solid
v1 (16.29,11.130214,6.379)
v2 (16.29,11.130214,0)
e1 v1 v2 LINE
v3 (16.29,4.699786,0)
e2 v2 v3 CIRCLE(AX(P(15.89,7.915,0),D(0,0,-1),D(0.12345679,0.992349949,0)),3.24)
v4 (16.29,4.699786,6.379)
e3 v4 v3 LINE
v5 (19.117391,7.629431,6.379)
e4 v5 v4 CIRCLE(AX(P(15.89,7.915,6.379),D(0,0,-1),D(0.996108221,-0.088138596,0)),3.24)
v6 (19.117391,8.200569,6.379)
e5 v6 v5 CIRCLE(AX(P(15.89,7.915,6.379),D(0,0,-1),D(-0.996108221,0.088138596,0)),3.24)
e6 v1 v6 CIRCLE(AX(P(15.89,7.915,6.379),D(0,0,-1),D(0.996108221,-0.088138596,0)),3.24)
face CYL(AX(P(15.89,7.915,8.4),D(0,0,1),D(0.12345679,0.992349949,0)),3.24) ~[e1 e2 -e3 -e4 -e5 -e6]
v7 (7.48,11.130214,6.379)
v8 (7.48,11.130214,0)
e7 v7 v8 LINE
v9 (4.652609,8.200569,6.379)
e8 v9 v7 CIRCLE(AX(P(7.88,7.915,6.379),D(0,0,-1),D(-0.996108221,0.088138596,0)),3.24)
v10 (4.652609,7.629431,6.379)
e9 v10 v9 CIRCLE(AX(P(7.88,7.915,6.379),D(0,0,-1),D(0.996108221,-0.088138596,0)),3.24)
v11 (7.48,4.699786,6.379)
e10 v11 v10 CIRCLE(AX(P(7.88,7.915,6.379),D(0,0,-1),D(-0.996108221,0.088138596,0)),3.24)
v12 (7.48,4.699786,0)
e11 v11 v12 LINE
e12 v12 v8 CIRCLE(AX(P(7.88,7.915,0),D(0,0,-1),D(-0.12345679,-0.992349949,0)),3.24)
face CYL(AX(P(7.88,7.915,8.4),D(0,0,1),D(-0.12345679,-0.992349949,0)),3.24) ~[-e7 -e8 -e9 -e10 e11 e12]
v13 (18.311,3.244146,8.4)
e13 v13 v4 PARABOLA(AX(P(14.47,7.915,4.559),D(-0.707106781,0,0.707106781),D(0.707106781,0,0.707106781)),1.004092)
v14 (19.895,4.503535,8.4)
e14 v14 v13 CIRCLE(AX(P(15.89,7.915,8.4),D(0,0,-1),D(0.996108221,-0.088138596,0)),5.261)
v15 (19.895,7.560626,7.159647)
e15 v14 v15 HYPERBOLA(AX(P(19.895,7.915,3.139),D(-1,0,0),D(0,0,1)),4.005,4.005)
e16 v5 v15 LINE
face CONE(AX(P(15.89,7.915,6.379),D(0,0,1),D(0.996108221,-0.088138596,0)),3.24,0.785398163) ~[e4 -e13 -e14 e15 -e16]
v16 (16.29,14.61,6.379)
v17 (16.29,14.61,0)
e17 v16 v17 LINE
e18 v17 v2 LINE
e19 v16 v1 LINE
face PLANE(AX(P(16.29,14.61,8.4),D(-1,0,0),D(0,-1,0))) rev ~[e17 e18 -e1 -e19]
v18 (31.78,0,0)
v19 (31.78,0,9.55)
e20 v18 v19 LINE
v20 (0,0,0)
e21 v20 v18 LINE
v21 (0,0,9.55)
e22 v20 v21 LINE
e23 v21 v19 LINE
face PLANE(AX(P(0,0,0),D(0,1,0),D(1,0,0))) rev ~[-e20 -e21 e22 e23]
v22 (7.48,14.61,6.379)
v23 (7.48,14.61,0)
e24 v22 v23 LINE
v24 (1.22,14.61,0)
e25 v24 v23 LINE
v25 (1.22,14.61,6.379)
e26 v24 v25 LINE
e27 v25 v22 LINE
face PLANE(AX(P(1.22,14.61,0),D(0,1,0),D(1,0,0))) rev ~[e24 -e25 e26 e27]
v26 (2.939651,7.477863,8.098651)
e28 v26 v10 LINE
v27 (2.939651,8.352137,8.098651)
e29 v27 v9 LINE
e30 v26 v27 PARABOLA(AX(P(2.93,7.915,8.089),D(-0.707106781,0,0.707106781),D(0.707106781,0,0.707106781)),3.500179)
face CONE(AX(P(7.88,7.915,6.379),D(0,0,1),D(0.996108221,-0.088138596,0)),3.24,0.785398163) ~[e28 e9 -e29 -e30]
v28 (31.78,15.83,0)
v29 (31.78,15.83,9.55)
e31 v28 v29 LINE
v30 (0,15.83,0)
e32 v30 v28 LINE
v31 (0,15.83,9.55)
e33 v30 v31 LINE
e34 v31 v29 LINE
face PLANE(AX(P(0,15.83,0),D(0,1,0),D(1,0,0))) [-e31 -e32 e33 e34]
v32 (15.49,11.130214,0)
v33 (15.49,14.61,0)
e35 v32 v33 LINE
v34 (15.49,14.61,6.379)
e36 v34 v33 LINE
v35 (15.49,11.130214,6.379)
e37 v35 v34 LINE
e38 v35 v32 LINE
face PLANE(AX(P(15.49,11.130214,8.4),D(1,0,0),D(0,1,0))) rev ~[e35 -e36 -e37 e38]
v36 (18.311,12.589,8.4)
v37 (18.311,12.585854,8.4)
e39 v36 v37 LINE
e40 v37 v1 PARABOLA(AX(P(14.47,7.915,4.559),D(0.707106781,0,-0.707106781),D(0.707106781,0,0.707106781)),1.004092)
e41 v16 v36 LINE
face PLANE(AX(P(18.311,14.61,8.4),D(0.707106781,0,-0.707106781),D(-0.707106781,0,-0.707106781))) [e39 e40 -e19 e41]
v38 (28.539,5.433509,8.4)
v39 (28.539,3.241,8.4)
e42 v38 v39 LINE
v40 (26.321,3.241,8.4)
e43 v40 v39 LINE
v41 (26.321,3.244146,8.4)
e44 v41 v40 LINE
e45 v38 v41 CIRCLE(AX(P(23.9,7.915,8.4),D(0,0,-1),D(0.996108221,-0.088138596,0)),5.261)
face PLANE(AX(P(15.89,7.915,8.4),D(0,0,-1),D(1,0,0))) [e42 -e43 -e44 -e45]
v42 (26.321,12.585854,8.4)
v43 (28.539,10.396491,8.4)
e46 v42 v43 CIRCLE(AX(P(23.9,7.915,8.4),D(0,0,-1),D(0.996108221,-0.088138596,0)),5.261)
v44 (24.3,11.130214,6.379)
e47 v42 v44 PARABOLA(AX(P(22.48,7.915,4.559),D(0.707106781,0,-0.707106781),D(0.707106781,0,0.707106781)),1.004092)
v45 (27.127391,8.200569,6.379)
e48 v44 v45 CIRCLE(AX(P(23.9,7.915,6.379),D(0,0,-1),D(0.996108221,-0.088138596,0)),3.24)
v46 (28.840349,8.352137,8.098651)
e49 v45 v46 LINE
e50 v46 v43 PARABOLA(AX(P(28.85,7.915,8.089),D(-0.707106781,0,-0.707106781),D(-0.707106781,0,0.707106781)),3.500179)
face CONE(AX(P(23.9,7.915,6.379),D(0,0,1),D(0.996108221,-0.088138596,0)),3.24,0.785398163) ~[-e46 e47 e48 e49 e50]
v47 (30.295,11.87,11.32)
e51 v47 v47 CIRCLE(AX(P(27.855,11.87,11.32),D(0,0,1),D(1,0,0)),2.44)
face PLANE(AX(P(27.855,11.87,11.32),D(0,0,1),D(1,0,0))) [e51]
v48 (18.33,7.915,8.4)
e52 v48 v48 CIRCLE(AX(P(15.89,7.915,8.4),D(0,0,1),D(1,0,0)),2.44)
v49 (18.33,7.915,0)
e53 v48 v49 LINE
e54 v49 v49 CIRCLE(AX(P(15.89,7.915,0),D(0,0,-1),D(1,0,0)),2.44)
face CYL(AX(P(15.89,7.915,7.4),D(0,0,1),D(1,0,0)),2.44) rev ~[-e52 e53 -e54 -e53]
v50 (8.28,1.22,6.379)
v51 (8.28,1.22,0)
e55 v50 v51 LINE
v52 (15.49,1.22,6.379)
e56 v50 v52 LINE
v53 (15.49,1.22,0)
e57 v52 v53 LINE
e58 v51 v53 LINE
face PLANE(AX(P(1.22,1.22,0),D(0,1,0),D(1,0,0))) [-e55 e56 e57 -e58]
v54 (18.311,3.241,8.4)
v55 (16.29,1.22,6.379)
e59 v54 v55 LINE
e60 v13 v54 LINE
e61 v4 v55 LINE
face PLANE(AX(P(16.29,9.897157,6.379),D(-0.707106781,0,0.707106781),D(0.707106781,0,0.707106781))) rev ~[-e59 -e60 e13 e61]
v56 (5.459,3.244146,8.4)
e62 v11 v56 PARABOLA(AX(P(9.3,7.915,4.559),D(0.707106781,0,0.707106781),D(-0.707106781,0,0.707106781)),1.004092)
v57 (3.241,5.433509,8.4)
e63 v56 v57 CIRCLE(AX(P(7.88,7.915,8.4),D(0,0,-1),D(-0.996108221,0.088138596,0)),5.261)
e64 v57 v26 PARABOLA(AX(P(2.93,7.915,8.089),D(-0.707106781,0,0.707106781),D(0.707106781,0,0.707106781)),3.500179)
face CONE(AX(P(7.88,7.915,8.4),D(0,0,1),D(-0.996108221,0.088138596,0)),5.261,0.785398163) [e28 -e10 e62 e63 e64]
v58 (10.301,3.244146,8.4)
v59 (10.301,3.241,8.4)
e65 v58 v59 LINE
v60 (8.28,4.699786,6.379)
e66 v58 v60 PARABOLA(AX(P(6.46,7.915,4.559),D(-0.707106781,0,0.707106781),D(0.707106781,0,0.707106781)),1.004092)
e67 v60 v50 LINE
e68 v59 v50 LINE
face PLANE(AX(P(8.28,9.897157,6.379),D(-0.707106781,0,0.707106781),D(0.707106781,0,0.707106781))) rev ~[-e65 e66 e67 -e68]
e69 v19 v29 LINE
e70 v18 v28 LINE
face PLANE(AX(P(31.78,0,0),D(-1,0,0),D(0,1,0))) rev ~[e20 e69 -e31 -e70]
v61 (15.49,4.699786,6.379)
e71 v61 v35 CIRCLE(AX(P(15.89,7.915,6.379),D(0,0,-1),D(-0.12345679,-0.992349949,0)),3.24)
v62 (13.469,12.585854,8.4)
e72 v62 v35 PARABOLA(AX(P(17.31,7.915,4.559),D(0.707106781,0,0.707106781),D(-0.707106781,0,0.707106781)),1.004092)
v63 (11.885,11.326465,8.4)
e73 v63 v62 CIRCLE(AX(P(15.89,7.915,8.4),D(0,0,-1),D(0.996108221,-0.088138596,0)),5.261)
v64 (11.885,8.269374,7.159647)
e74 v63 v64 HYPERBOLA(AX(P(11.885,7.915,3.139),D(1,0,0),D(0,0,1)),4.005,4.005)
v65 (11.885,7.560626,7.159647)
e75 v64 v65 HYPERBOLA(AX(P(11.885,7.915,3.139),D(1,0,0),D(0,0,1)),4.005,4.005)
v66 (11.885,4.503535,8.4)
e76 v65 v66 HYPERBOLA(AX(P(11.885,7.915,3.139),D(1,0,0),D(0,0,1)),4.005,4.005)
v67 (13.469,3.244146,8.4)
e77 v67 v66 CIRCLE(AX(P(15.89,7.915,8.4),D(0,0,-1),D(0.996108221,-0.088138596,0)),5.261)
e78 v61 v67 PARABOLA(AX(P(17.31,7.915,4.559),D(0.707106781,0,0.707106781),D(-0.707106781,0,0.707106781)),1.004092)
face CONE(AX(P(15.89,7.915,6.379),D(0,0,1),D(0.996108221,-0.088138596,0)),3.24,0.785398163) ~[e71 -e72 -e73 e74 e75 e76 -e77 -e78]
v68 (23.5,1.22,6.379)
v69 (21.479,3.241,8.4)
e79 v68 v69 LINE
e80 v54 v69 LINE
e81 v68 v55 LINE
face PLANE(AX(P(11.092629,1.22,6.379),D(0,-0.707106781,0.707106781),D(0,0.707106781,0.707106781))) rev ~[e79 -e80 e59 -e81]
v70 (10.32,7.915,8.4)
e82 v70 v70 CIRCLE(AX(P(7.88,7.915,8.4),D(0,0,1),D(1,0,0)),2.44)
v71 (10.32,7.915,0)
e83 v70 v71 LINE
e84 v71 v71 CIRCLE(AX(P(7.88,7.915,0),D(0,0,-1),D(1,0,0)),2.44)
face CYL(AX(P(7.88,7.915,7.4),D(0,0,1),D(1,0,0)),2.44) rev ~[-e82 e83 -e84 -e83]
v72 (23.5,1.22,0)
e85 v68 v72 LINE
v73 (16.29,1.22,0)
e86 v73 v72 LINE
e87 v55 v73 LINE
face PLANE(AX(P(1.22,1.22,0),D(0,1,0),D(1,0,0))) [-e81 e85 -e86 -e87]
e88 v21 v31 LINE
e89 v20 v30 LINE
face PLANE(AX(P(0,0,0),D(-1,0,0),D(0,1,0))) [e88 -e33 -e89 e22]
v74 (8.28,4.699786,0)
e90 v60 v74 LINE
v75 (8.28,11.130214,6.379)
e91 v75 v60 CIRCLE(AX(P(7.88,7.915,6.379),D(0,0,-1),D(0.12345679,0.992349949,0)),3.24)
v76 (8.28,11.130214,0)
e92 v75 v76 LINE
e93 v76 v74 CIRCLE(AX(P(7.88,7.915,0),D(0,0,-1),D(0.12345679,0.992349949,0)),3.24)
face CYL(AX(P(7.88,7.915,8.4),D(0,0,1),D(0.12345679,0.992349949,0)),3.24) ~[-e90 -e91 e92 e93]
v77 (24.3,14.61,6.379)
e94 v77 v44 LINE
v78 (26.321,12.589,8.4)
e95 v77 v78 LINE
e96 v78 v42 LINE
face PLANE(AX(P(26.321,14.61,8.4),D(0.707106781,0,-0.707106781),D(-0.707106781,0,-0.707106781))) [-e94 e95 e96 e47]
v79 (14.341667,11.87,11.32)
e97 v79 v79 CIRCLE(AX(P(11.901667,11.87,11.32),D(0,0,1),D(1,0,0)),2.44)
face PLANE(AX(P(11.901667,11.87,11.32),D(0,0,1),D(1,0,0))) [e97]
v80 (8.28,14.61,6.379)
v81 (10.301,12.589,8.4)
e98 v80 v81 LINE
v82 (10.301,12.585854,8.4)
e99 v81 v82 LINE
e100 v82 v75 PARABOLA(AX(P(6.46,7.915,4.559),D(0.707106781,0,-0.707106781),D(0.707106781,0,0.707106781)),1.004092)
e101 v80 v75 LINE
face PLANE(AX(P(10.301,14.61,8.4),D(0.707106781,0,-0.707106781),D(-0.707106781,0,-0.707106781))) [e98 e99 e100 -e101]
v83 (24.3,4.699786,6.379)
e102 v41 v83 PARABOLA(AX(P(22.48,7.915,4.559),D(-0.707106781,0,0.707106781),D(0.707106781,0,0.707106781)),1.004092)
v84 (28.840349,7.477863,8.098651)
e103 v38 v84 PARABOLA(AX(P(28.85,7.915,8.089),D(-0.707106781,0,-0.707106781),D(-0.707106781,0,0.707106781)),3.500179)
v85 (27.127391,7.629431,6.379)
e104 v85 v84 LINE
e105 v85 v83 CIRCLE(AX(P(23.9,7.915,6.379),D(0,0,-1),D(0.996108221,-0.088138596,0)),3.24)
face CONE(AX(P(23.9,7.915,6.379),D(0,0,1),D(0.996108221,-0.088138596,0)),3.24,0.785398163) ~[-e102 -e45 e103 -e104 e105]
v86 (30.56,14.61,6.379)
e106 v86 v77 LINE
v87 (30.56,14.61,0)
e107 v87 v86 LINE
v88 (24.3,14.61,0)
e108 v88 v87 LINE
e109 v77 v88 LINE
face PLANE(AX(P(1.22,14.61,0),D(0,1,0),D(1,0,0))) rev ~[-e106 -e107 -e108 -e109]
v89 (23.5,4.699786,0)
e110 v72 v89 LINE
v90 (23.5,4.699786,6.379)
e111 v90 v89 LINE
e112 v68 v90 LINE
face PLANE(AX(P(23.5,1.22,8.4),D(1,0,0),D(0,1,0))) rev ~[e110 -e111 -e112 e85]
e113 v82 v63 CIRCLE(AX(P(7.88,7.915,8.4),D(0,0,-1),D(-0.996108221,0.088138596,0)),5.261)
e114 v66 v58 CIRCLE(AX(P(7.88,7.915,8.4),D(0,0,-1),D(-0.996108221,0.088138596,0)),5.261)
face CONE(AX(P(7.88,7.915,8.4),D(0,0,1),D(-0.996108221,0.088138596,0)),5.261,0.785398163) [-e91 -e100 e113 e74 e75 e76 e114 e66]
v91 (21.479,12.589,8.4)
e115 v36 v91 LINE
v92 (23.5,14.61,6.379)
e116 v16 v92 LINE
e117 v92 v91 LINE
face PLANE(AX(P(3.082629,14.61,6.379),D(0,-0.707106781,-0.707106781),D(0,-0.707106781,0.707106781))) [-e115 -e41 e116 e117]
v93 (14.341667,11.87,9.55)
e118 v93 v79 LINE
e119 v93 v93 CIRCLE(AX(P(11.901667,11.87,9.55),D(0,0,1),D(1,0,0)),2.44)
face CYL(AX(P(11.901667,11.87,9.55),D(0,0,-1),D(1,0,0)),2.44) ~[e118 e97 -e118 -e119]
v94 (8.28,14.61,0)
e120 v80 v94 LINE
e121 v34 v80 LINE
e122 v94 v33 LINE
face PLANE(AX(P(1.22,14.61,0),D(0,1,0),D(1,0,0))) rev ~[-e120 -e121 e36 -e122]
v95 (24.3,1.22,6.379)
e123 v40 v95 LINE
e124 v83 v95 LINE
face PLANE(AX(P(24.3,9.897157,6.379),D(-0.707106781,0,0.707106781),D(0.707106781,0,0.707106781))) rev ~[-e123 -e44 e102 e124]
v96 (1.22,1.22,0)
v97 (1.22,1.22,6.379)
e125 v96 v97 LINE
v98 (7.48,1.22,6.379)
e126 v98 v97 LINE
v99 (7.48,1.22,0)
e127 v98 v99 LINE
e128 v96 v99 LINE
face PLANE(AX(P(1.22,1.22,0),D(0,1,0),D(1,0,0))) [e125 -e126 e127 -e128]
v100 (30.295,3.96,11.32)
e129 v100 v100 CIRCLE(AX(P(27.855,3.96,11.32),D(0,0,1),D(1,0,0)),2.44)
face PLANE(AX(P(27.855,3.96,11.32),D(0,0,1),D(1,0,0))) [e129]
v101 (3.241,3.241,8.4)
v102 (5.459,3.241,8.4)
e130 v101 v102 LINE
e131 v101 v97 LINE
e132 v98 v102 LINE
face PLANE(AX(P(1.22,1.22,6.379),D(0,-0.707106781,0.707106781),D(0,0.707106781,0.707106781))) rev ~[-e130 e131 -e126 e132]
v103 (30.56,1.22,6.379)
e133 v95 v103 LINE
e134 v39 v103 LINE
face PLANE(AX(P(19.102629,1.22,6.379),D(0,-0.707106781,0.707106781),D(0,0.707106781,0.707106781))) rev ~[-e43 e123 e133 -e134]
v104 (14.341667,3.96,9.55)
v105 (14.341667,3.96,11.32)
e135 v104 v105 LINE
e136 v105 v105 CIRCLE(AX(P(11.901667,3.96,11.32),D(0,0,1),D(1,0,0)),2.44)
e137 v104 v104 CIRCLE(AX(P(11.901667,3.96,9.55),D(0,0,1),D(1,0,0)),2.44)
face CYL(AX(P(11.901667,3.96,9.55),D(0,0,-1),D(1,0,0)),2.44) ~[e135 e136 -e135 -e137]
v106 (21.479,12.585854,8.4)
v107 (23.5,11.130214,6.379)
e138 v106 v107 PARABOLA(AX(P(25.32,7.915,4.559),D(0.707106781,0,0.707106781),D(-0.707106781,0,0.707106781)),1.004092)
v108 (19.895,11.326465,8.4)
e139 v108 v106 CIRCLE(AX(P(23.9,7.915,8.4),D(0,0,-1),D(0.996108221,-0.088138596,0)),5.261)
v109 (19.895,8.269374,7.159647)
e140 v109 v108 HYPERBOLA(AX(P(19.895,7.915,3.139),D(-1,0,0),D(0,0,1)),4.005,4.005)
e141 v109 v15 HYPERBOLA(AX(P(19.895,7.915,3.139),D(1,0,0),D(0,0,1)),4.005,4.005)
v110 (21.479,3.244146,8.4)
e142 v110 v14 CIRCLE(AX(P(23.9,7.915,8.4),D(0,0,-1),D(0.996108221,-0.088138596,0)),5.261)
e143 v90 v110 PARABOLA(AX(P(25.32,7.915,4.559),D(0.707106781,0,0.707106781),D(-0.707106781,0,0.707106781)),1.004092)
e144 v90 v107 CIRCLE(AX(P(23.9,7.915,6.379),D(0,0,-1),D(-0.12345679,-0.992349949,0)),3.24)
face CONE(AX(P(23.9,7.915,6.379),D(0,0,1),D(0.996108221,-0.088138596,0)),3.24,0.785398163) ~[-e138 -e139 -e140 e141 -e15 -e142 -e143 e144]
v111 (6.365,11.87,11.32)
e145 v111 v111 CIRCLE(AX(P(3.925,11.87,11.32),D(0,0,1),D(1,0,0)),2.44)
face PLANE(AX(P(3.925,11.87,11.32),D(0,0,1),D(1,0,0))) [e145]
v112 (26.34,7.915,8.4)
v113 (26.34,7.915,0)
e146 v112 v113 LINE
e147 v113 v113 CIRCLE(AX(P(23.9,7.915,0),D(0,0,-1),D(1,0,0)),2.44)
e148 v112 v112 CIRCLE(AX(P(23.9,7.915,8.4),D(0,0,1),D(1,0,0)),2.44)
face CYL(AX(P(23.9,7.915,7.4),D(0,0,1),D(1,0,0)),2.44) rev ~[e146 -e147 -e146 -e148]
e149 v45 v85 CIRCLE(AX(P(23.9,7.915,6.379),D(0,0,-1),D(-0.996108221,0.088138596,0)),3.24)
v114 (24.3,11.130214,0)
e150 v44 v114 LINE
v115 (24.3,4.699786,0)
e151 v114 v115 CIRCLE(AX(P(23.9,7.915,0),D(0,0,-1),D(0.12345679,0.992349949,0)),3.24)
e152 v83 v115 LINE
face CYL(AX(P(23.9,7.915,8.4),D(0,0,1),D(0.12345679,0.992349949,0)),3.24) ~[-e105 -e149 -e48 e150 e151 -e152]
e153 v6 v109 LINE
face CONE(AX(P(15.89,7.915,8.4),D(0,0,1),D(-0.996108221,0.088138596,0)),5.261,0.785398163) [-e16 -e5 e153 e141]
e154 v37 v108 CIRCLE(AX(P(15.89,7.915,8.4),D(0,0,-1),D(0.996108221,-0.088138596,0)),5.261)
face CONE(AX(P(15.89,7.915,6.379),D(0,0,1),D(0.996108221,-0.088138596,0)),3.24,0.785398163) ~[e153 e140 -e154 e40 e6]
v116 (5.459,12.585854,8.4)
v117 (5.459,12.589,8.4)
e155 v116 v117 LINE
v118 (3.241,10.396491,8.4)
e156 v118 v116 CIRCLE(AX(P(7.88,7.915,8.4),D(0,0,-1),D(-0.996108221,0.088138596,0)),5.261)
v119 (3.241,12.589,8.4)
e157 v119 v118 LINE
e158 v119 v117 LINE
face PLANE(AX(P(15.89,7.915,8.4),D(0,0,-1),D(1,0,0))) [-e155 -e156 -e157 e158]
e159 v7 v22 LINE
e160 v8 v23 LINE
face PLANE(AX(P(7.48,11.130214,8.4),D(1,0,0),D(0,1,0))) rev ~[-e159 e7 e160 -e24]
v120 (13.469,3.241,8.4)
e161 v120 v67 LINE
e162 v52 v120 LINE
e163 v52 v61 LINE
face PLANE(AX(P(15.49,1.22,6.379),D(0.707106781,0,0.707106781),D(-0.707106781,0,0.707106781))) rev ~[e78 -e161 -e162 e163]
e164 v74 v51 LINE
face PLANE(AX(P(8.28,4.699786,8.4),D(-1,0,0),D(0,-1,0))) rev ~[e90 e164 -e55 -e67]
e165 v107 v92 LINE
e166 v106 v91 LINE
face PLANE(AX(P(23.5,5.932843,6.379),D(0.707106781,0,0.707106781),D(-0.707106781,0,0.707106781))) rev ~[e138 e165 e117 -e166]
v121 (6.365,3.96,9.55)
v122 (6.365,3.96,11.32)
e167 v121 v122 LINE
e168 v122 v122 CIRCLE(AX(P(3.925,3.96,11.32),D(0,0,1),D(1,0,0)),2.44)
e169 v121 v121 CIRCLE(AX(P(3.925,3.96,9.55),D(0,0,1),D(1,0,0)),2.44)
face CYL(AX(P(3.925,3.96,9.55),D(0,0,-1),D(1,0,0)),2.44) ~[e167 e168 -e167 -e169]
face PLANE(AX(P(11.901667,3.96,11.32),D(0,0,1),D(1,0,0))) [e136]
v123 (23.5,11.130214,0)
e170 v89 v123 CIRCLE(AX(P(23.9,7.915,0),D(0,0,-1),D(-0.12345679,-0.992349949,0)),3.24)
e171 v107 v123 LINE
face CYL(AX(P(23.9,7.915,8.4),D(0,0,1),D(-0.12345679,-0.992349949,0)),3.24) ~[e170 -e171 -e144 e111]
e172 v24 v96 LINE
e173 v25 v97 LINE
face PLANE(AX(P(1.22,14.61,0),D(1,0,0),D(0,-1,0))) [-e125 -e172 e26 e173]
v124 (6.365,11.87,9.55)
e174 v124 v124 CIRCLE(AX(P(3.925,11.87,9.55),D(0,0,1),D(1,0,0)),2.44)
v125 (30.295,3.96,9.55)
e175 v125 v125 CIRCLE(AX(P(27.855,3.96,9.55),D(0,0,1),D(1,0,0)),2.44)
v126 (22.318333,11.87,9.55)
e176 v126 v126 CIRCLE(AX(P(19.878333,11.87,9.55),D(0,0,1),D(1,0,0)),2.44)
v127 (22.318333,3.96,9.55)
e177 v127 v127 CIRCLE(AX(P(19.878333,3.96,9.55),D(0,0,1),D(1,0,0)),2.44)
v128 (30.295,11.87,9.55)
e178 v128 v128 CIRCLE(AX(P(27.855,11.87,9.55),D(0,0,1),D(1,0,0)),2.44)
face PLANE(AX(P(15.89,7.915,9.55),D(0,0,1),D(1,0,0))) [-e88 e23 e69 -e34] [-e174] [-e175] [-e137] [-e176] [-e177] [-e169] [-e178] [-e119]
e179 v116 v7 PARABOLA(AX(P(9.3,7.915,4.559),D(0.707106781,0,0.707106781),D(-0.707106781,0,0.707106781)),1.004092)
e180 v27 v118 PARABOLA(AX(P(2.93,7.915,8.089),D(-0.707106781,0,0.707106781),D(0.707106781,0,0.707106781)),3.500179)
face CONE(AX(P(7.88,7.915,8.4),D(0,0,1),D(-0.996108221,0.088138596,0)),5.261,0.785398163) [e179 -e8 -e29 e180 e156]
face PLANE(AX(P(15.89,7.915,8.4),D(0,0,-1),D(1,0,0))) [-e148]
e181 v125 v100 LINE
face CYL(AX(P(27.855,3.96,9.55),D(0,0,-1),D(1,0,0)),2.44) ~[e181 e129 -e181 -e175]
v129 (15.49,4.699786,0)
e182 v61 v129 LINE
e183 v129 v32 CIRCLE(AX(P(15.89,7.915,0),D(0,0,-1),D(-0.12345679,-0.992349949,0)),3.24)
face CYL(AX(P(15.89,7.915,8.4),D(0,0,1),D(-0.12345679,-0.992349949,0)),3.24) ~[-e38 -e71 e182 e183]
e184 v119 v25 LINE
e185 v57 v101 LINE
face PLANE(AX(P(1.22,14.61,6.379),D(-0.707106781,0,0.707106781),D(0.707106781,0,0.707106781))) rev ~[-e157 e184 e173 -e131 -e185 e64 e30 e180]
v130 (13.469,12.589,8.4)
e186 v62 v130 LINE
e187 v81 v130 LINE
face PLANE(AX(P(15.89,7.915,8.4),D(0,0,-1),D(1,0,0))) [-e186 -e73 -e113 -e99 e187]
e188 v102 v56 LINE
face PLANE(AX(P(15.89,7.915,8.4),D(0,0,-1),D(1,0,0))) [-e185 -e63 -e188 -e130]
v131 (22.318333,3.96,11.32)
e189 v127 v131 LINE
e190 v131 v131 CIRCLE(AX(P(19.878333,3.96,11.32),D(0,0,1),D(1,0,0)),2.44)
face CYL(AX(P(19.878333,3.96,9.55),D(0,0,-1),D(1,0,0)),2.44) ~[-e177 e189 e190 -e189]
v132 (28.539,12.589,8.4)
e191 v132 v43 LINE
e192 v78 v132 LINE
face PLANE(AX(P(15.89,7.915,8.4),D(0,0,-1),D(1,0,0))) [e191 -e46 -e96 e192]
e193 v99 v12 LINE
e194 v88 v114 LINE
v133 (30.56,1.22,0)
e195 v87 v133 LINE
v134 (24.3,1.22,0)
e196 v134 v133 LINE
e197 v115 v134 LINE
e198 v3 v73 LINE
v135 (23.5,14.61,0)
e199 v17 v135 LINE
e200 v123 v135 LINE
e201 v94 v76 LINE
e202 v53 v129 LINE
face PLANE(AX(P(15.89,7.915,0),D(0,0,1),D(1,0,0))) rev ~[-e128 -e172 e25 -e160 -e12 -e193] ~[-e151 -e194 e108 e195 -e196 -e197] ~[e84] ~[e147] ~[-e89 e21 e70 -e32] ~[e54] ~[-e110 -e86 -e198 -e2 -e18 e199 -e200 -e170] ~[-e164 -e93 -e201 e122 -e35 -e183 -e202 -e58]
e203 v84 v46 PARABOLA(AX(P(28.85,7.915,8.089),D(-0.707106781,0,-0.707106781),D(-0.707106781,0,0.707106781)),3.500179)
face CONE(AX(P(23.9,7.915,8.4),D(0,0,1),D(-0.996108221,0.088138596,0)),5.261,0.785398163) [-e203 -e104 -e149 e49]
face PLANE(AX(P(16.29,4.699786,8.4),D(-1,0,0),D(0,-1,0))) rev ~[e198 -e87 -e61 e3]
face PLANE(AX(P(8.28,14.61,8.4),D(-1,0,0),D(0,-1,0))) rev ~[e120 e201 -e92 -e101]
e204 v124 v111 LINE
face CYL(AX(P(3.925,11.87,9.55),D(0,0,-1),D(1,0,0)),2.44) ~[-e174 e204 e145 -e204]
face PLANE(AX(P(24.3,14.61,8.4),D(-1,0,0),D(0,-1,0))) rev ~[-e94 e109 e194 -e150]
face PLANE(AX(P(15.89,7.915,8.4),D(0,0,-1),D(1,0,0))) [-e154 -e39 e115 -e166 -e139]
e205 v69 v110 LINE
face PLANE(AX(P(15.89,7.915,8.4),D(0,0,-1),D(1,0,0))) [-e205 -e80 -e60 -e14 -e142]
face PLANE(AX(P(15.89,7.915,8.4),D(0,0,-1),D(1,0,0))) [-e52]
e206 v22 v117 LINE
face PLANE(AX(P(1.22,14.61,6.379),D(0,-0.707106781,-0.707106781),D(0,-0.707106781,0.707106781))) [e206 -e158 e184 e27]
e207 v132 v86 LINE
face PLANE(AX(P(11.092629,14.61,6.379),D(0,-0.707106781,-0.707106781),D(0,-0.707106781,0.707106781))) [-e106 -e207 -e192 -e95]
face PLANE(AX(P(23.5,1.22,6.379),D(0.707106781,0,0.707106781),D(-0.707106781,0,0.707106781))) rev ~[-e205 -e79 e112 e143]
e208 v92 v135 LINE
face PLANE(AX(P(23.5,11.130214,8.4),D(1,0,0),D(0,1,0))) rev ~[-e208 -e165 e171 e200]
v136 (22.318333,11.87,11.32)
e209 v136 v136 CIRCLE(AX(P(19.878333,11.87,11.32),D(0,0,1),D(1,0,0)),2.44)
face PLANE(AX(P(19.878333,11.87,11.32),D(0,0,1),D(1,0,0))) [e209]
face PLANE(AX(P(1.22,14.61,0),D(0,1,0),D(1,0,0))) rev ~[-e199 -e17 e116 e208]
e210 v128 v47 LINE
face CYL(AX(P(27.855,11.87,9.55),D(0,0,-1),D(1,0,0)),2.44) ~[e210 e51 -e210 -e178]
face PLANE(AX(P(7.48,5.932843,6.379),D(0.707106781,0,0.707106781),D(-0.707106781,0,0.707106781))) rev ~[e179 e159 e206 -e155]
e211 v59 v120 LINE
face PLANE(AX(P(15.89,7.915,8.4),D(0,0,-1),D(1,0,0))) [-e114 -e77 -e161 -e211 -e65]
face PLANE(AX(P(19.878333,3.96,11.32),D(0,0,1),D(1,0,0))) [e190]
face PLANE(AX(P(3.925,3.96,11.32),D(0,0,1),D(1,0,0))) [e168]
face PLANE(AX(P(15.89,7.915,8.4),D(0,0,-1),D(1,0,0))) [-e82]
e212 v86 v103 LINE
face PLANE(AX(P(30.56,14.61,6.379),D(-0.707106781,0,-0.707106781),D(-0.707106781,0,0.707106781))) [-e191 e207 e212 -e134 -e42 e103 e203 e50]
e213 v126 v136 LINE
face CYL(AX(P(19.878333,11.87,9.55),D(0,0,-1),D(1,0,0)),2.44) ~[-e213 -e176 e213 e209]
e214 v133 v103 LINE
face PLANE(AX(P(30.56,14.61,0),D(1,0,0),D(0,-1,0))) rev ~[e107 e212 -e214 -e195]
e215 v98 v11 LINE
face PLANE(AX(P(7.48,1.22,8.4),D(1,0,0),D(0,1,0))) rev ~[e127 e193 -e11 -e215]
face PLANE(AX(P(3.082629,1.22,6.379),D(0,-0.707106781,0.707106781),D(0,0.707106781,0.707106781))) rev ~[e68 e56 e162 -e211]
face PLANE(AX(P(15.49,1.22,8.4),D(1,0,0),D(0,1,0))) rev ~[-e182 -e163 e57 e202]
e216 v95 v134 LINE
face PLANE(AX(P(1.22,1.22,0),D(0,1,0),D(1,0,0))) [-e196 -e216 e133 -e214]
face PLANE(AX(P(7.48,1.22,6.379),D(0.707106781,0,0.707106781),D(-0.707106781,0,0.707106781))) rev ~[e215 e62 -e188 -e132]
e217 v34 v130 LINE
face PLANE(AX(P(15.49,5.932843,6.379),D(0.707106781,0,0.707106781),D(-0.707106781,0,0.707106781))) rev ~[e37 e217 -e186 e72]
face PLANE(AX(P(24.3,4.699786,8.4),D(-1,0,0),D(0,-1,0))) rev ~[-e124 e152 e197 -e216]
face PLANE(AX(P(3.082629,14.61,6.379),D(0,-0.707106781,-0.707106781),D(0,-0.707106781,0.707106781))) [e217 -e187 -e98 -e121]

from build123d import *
from build123d import SkipClean  # not in build123d's __all__

# Parameters (mm, degrees)
F0_W         = 31.78
F0_H         = 15.83
F1_DEPTH     = 9.55
F2_R         = 2.44
F3_DEPTH     = 1.77
F4_W         = 29.34
F4_H         = 13.39
F5_DEPTH     = 8.4
F6_R         = 2.44
F7_DEPTH     = 8.4
F8_T1_DEPTH  = 17.6047426374
F8_T3_DEPTH  = 17.6047426374
F8_T5_DEPTH  = 11.4573713187
F8_T7_DEPTH  = 11.4573713187
F8_T9_DEPTH  = 13.39
F8_T14_DEPTH = 8.6771574844
F8_S15_R     = 2.44
F8_T16_DEPTH = 6
F8_T18_ANGLE = 349.8869381759
F8_T22_DEPTH = 8.6771574844
F8_S23_R     = 2.44
F8_T24_DEPTH = 6
F8_T28_DEPTH = 8.6771574844
F8_S29_R     = 2.44
F8_T30_DEPTH = 6
F8_T32_ANGLE = 349.8869381759
F8_T36_DEPTH = 8.6771574844
F8_S37_R     = 2.44
F8_T38_DEPTH = 6
F8_T42_DEPTH = 8.6771574844
F8_S43_R     = 2.44
F8_T44_DEPTH = 6
F8_T46_ANGLE = 349.8869381759
F8_T50_DEPTH = 8.6771574844
F8_S51_R     = 2.44
F8_T52_DEPTH = 6
F8_T56_DEPTH = 8.6771574844
F8_S57_R     = 2.44
F8_T58_DEPTH = 6
F8_T60_ANGLE = 349.8869381759
F8_T64_DEPTH = 8.6771574844
F8_S65_R     = 2.44
F8_T66_DEPTH = 6
F8_T70_DEPTH = 8.6771574844
F8_S71_R     = 2.44
F8_T72_DEPTH = 6
F8_T76_DEPTH = 8.6771574844
F8_S77_R     = 2.44
F8_T78_DEPTH = 6
F8_T80_ANGLE = 349.8869381759
F8_T84_DEPTH = 8.6771574844
F8_S85_R     = 2.44
F8_T86_DEPTH = 6
F8_T88_ANGLE = 349.8869381759
F8_T92_DEPTH = 8.6771574844
F8_S93_R     = 2.44
F8_T94_DEPTH = 6


# Not quite as in the source:
# - a fillet or chamfer that OpenCascade refuses, or shapes differently, is made with other operations: its cross-section is extruded or revolved along the edge and cut away or added


with BuildPart() as f1:
    # F0 (on Top) → F1 (new body)
    with BuildSketch(Plane.XY):
        with Locations((15.89, 7.915)):
            Rectangle(F0_W, F0_H)
    extrude(amount=F1_DEPTH)

    # F2 (on face) → F3 (join)
    with BuildSketch(Plane.XY.offset(9.55)):
        with Locations((27.855, 3.96)):
            Circle(F2_R)
        with Locations((27.855, 11.87)):
            Circle(F2_R)
        with Locations((19.8783333333, 3.96)):
            Circle(F2_R)
        with Locations((19.8783333333, 11.87)):
            Circle(F2_R)
        with Locations((11.9016666667, 3.96)):
            Circle(F2_R)
        with Locations((11.9016666667, 11.87)):
            Circle(F2_R)
        with Locations((3.925, 3.96)):
            Circle(F2_R)
        with Locations((3.925, 11.87)):
            Circle(F2_R)
    extrude(amount=F3_DEPTH)

    # F4 (on face) → F5 (cut)
    with BuildSketch(Plane(origin=(0, 0, 0), x_dir=(1, 0, 0), z_dir=(0, 0, -1))):
        with Locations((15.89, -7.915)):
            Rectangle(F4_W, F4_H)
    extrude(amount=-F5_DEPTH, mode=Mode.SUBTRACT)

    # F6 (on face) → F7 (join, through all)
    with BuildSketch(Plane(origin=(0, 0, 8.4), x_dir=(1, 0, 0), z_dir=(0, 0, -1))):
        with BuildLine():
            Line((15.49, -1.22), (15.49, -4.6997861657))
            ThreePointArc((15.49, -4.6997861657), (12.65, -7.915), (15.49, -11.1302138343))
            Line((15.49, -11.1302138343), (15.49, -14.61))
            Line((15.49, -14.61), (16.29, -14.61))
            Line((16.29, -14.61), (16.29, -11.1302138343))
            ThreePointArc((16.29, -11.1302138343), (19.13, -7.915), (16.29, -4.6997861657))
            Line((16.29, -4.6997861657), (16.29, -1.22))
            Line((16.29, -1.22), (15.49, -1.22))
        make_face()
        with Locations((15.89, -7.915)):
            Circle(F6_R, mode=Mode.SUBTRACT)
        with BuildLine():
            Line((24.3, -14.61), (24.3, -11.1302138343))
            ThreePointArc((24.3, -11.1302138343), (27.14, -7.915), (24.3, -4.6997861657))
            Line((24.3, -4.6997861657), (24.3, -1.22))
            Line((24.3, -1.22), (23.5, -1.22))
            Line((23.5, -1.22), (23.5, -4.6997861657))
            ThreePointArc((23.5, -4.6997861657), (20.66, -7.915), (23.5, -11.1302138343))
            Line((23.5, -11.1302138343), (23.5, -14.61))
            Line((23.5, -14.61), (24.3, -14.61))
        make_face()
        with Locations((23.9, -7.915)):
            Circle(F6_R, mode=Mode.SUBTRACT)
        with BuildLine():
            ThreePointArc((8.28, -11.1302138343), (11.12, -7.915), (8.28, -4.6997861657))
            Line((8.28, -4.6997861657), (8.28, -1.22))
            Line((8.28, -1.22), (7.48, -1.22))
            Line((7.48, -1.22), (7.48, -4.6997861657))
            ThreePointArc((7.48, -4.6997861657), (4.64, -7.915), (7.48, -11.1302138343))
            Line((7.48, -11.1302138343), (7.48, -14.61))
            Line((7.48, -14.61), (8.28, -14.61))
            Line((8.28, -14.61), (8.28, -11.1302138343))
        make_face()
        with Locations((7.88, -7.915)):
            Circle(F6_R, mode=Mode.SUBTRACT)
    extrude(amount=F7_DEPTH)

    # F8: chamfer of 2.021 on 28 edges, made by hand

    # F8_s2 → F8_t1 (join)
    with BuildSketch(Plane.YZ.offset(3.0826286813)):
        Polygon((1.22, 6.379), (3.241, 8.4), (1.22, 8.4), align=None)
        Polygon((14.61, 6.379), (12.589, 8.4), (14.61, 8.4), align=None)
    extrude(amount=F8_T1_DEPTH)

    # F8_s4 → F8_t3 (join)
    with BuildSketch(Plane.YZ.offset(11.0926286813)):
        Polygon((1.22, 6.379), (3.241, 8.4), (1.22, 8.4), align=None)
        Polygon((14.61, 6.379), (12.589, 8.4), (14.61, 8.4), align=None)
    extrude(amount=F8_T3_DEPTH)

    # F8_s6 → F8_t5 (join)
    with BuildSketch(Plane.YZ.offset(19.1026286813)):
        Polygon((1.22, 6.379), (3.241, 8.4), (1.22, 8.4), align=None)
        Polygon((14.61, 6.379), (12.589, 8.4), (14.61, 8.4), align=None)
    extrude(amount=F8_T5_DEPTH)

    # F8_s8 → F8_t7 (join)
    with BuildSketch(Plane.YZ.offset(1.22)):
        Polygon((1.22, 6.379), (3.241, 8.4), (1.22, 8.4), align=None)
        Polygon((14.61, 6.379), (12.589, 8.4), (14.61, 8.4), align=None)
    extrude(amount=F8_T7_DEPTH)

    # F8_s10 → F8_t9 (join)
    with BuildSketch(Plane.XZ.offset(-14.61)):
        Polygon((30.56, 6.379), (28.539, 8.4), (30.56, 8.4), align=None)
        Polygon((1.22, 6.379), (3.241, 8.4), (1.22, 8.4), align=None)
    extrude(amount=F8_T9_DEPTH)


with BuildPart() as f8_tool12:
    # F8_s13 → F8_t14 (new body)
    with BuildSketch(Plane.XZ.offset(-1.22)):
        Polygon((15.49, 6.379), (13.469, 8.4), (15.49, 8.4), align=None)
    extrude(amount=-F8_T14_DEPTH)

    # F8_s15 → F8_t16 (cut, symmetric)
    with BuildSketch(Plane.XY.offset(7.4)):
        with Locations((15.89, 7.915)):
            Circle(F8_S15_R)
    extrude(amount=F8_T16_DEPTH, both=True, mode=Mode.SUBTRACT)


with BuildPart() as f1_1:
    add(f1.part, clean=False)

    # F8_t11: union F8_tool12
    add(f8_tool12.part)

    # F8_s17 → F8_t18 (revolve)
    with BuildSketch(Plane(origin=(0.8183420867, 9.2485847883, 0), x_dir=(0, 0, 1), z_dir=(0.0881385962, 0.996108221, 0))):
        Polygon((6.379, 18.370542642), (8.4, 20.391542642), (8.4, 18.370542642), align=None)
    revolve(axis=Axis((15.89, 7.915, 8.4), (0, 0, -1)), revolution_arc=F8_T18_ANGLE)


with BuildPart() as f8_tool20:
    # F8_s21 → F8_t22 (new body)
    with BuildSketch(Plane.XZ.offset(-5.9328425156)):
        Polygon((15.49, 6.379), (13.469, 8.4), (15.49, 8.4), align=None)
    extrude(amount=-F8_T22_DEPTH)

    # F8_s23 → F8_t24 (cut, symmetric)
    with BuildSketch(Plane.XY.offset(7.4)):
        with Locations((15.89, 7.915)):
            Circle(F8_S23_R)
    extrude(amount=F8_T24_DEPTH, both=True, mode=Mode.SUBTRACT)


with BuildPart() as f1_2:
    add(f1_1.part, clean=False)

    # F8_t19: union F8_tool20
    add(f8_tool20.part)


with BuildPart() as f8_tool26:
    # F8_s27 → F8_t28 (new body)
    with BuildSketch(Plane.XZ.offset(-14.61)):
        Polygon((10.301, 8.4), (8.28, 6.379), (8.28, 8.4), align=None)
    extrude(amount=F8_T28_DEPTH)

    # F8_s29 → F8_t30 (cut, symmetric)
    with BuildSketch(Plane.XY.offset(7.4)):
        with Locations((7.88, 7.915)):
            Circle(F8_S29_R)
    extrude(amount=F8_T30_DEPTH, both=True, mode=Mode.SUBTRACT)


with BuildPart() as f1_3:
    add(f1_2.part, clean=False)

    # F8_t25: union F8_tool26
    add(f8_tool26.part)

    # F8_s31 → F8_t32 (revolve)
    with BuildSketch(Plane(origin=(0.7561171055, 8.5453421904, 0), x_dir=(0, 0, 1), z_dir=(-0.0881385962, -0.996108221, 0))):
        Polygon((8.4, -1.8907157922), (6.379, -3.9117157922), (8.4, -3.9117157922), align=None)
    revolve(axis=Axis((7.88, 7.915, 8.4), (0, 0, -1)), revolution_arc=F8_T32_ANGLE)


with BuildPart() as f8_tool34:
    # F8_s35 → F8_t36 (new body)
    with BuildSketch(Plane.XZ.offset(-9.8971574844)):
        Polygon((8.28, 6.379), (10.301, 8.4), (8.28, 8.4), align=None)
    extrude(amount=F8_T36_DEPTH)

    # F8_s37 → F8_t38 (cut, symmetric)
    with BuildSketch(Plane.XY.offset(7.4)):
        with Locations((7.88, 7.915)):
            Circle(F8_S37_R)
    extrude(amount=F8_T38_DEPTH, both=True, mode=Mode.SUBTRACT)


with BuildPart() as f1_4:
    add(f1_3.part, clean=False)

    # F8_t33: union F8_tool34
    add(f8_tool34.part)


with BuildPart() as f8_tool40:
    # F8_s41 → F8_t42 (new body)
    with BuildSketch(Plane.XZ.offset(-1.22)):
        Polygon((23.5, 6.379), (21.479, 8.4), (23.5, 8.4), align=None)
    extrude(amount=-F8_T42_DEPTH)

    # F8_s43 → F8_t44 (cut, symmetric)
    with BuildSketch(Plane.XY.offset(7.4)):
        with Locations((23.9, 7.915)):
            Circle(F8_S43_R)
    extrude(amount=F8_T44_DEPTH, both=True, mode=Mode.SUBTRACT)


with BuildPart() as f1_5:
    add(f1_4.part, clean=False)

    # F8_t39: union F8_tool40
    add(f8_tool40.part)

    # F8_s45 → F8_t46 (revolve)
    with BuildSketch(Plane(origin=(0.880567068, 9.9518273862, 0), x_dir=(0, 0, 1), z_dir=(0.0881385962, 0.996108221, 0))):
        Polygon((6.379, 26.3493694919), (8.4, 28.3703694919), (8.4, 26.3493694919), align=None)
    revolve(axis=Axis((23.9, 7.915, 8.4), (0, 0, -1)), revolution_arc=F8_T46_ANGLE)


with BuildPart() as f8_tool48:
    # F8_s49 → F8_t50 (new body)
    with BuildSketch(Plane.XZ.offset(-5.9328425156)):
        Polygon((23.5, 6.379), (21.479, 8.4), (23.5, 8.4), align=None)
    extrude(amount=-F8_T50_DEPTH)

    # F8_s51 → F8_t52 (cut, symmetric)
    with BuildSketch(Plane.XY.offset(7.4)):
        with Locations((23.9, 7.915)):
            Circle(F8_S51_R)
    extrude(amount=F8_T52_DEPTH, both=True, mode=Mode.SUBTRACT)


with BuildPart() as f1_6:
    add(f1_5.part, clean=False)

    # F8_t47: union F8_tool48
    add(f8_tool48.part)


with BuildPart() as f8_tool54:
    # F8_s55 → F8_t56 (new body)
    with BuildSketch(Plane.XZ.offset(-14.61)):
        Polygon((18.311, 8.4), (16.29, 6.379), (16.29, 8.4), align=None)
    extrude(amount=F8_T56_DEPTH)

    # F8_s57 → F8_t58 (cut, symmetric)
    with BuildSketch(Plane.XY.offset(7.4)):
        with Locations((15.89, 7.915)):
            Circle(F8_S57_R)
    extrude(amount=F8_T58_DEPTH, both=True, mode=Mode.SUBTRACT)


with BuildPart() as f1_7:
    add(f1_6.part, clean=False)

    # F8_t53: union F8_tool54
    add(f8_tool54.part)

    # F8_s59 → F8_t60 (revolve)
    with BuildSketch(Plane(origin=(0.8183420867, 9.2485847883, 0), x_dir=(0, 0, 1), z_dir=(-0.0881385962, -0.996108221, 0))):
        Polygon((8.4, -9.869542642), (6.379, -11.890542642), (8.4, -11.890542642), align=None)
    with SkipClean():  # cleaning this boolean's faces spoils the solid; the shape is the same uncleaned
        revolve(axis=Axis((15.89, 7.915, 8.4), (0, 0, -1)), revolution_arc=F8_T60_ANGLE)


with BuildPart() as f8_tool62:
    # F8_s63 → F8_t64 (new body)
    with BuildSketch(Plane.XZ.offset(-9.8971574844)):
        Polygon((16.29, 6.379), (18.311, 8.4), (16.29, 8.4), align=None)
    extrude(amount=F8_T64_DEPTH)

    # F8_s65 → F8_t66 (cut, symmetric)
    with BuildSketch(Plane.XY.offset(7.4)):
        with Locations((15.89, 7.915)):
            Circle(F8_S65_R)
    extrude(amount=F8_T66_DEPTH, both=True, mode=Mode.SUBTRACT)


with BuildPart() as f1_8:
    add(f1_7.part, clean=False)

    # F8_t61: union F8_tool62
    add(f8_tool62.part)


with BuildPart() as f8_tool68:
    # F8_s69 → F8_t70 (new body)
    with BuildSketch(Plane.XZ.offset(-9.8971574844)):
        Polygon((24.3, 6.379), (26.321, 8.4), (24.3, 8.4), align=None)
    extrude(amount=F8_T70_DEPTH)

    # F8_s71 → F8_t72 (cut, symmetric)
    with BuildSketch(Plane.XY.offset(7.4)):
        with Locations((23.9, 7.915)):
            Circle(F8_S71_R)
    extrude(amount=F8_T72_DEPTH, both=True, mode=Mode.SUBTRACT)


with BuildPart() as f1_9:
    add(f1_8.part, clean=False)

    # F8_t67: union F8_tool68
    add(f8_tool68.part)


with BuildPart() as f8_tool74:
    # F8_s75 → F8_t76 (new body)
    with BuildSketch(Plane.XZ.offset(-14.61)):
        Polygon((26.321, 8.4), (24.3, 6.379), (24.3, 8.4), align=None)
    extrude(amount=F8_T76_DEPTH)

    # F8_s77 → F8_t78 (cut, symmetric)
    with BuildSketch(Plane.XY.offset(7.4)):
        with Locations((23.9, 7.915)):
            Circle(F8_S77_R)
    extrude(amount=F8_T78_DEPTH, both=True, mode=Mode.SUBTRACT)


with BuildPart() as f1_10:
    add(f1_9.part, clean=False)

    # F8_t73: union F8_tool74
    add(f8_tool74.part)

    # F8_s79 → F8_t80 (revolve)
    with BuildSketch(Plane(origin=(0.880567068, 9.9518273862, 0), x_dir=(0, 0, 1), z_dir=(-0.0881385962, -0.996108221, 0))):
        Polygon((8.4, -17.8483694919), (6.379, -19.8693694919), (8.4, -19.8693694919), align=None)
    with SkipClean():  # cleaning this boolean's faces spoils the solid; the shape is the same uncleaned
        revolve(axis=Axis((23.9, 7.915, 8.4), (0, 0, -1)), revolution_arc=F8_T80_ANGLE)


with BuildPart() as f8_tool82:
    # F8_s83 → F8_t84 (new body)
    with BuildSketch(Plane.XZ.offset(-1.22)):
        Polygon((7.48, 6.379), (5.459, 8.4), (7.48, 8.4), align=None)
    extrude(amount=-F8_T84_DEPTH)

    # F8_s85 → F8_t86 (cut, symmetric)
    with BuildSketch(Plane.XY.offset(7.4)):
        with Locations((7.88, 7.915)):
            Circle(F8_S85_R)
    extrude(amount=F8_T86_DEPTH, both=True, mode=Mode.SUBTRACT)


with BuildPart() as f1_11:
    add(f1_10.part, clean=False)

    # F8_t81: union F8_tool82
    add(f8_tool82.part)

    # F8_s87 → F8_t88 (revolve)
    with BuildSketch(Plane(origin=(0.7561171055, 8.5453421904, 0), x_dir=(0, 0, 1), z_dir=(0.0881385962, 0.996108221, 0))):
        Polygon((6.379, 10.3917157922), (8.4, 12.4127157922), (8.4, 10.3917157922), align=None)
    revolve(axis=Axis((7.88, 7.915, 8.4), (0, 0, -1)), revolution_arc=F8_T88_ANGLE)


with BuildPart() as f8_tool90:
    # F8_s91 → F8_t92 (new body)
    with BuildSketch(Plane.XZ.offset(-5.9328425156)):
        Polygon((7.48, 6.379), (5.459, 8.4), (7.48, 8.4), align=None)
    extrude(amount=-F8_T92_DEPTH)

    # F8_s93 → F8_t94 (cut, symmetric)
    with BuildSketch(Plane.XY.offset(7.4)):
        with Locations((7.88, 7.915)):
            Circle(F8_S93_R)
    extrude(amount=F8_T94_DEPTH, both=True, mode=Mode.SUBTRACT)


with BuildPart() as f1_12:
    add(f1_11.part, clean=False)

    # F8_t89: union F8_tool90
    add(f8_tool90.part)


solid = f1_12.part
